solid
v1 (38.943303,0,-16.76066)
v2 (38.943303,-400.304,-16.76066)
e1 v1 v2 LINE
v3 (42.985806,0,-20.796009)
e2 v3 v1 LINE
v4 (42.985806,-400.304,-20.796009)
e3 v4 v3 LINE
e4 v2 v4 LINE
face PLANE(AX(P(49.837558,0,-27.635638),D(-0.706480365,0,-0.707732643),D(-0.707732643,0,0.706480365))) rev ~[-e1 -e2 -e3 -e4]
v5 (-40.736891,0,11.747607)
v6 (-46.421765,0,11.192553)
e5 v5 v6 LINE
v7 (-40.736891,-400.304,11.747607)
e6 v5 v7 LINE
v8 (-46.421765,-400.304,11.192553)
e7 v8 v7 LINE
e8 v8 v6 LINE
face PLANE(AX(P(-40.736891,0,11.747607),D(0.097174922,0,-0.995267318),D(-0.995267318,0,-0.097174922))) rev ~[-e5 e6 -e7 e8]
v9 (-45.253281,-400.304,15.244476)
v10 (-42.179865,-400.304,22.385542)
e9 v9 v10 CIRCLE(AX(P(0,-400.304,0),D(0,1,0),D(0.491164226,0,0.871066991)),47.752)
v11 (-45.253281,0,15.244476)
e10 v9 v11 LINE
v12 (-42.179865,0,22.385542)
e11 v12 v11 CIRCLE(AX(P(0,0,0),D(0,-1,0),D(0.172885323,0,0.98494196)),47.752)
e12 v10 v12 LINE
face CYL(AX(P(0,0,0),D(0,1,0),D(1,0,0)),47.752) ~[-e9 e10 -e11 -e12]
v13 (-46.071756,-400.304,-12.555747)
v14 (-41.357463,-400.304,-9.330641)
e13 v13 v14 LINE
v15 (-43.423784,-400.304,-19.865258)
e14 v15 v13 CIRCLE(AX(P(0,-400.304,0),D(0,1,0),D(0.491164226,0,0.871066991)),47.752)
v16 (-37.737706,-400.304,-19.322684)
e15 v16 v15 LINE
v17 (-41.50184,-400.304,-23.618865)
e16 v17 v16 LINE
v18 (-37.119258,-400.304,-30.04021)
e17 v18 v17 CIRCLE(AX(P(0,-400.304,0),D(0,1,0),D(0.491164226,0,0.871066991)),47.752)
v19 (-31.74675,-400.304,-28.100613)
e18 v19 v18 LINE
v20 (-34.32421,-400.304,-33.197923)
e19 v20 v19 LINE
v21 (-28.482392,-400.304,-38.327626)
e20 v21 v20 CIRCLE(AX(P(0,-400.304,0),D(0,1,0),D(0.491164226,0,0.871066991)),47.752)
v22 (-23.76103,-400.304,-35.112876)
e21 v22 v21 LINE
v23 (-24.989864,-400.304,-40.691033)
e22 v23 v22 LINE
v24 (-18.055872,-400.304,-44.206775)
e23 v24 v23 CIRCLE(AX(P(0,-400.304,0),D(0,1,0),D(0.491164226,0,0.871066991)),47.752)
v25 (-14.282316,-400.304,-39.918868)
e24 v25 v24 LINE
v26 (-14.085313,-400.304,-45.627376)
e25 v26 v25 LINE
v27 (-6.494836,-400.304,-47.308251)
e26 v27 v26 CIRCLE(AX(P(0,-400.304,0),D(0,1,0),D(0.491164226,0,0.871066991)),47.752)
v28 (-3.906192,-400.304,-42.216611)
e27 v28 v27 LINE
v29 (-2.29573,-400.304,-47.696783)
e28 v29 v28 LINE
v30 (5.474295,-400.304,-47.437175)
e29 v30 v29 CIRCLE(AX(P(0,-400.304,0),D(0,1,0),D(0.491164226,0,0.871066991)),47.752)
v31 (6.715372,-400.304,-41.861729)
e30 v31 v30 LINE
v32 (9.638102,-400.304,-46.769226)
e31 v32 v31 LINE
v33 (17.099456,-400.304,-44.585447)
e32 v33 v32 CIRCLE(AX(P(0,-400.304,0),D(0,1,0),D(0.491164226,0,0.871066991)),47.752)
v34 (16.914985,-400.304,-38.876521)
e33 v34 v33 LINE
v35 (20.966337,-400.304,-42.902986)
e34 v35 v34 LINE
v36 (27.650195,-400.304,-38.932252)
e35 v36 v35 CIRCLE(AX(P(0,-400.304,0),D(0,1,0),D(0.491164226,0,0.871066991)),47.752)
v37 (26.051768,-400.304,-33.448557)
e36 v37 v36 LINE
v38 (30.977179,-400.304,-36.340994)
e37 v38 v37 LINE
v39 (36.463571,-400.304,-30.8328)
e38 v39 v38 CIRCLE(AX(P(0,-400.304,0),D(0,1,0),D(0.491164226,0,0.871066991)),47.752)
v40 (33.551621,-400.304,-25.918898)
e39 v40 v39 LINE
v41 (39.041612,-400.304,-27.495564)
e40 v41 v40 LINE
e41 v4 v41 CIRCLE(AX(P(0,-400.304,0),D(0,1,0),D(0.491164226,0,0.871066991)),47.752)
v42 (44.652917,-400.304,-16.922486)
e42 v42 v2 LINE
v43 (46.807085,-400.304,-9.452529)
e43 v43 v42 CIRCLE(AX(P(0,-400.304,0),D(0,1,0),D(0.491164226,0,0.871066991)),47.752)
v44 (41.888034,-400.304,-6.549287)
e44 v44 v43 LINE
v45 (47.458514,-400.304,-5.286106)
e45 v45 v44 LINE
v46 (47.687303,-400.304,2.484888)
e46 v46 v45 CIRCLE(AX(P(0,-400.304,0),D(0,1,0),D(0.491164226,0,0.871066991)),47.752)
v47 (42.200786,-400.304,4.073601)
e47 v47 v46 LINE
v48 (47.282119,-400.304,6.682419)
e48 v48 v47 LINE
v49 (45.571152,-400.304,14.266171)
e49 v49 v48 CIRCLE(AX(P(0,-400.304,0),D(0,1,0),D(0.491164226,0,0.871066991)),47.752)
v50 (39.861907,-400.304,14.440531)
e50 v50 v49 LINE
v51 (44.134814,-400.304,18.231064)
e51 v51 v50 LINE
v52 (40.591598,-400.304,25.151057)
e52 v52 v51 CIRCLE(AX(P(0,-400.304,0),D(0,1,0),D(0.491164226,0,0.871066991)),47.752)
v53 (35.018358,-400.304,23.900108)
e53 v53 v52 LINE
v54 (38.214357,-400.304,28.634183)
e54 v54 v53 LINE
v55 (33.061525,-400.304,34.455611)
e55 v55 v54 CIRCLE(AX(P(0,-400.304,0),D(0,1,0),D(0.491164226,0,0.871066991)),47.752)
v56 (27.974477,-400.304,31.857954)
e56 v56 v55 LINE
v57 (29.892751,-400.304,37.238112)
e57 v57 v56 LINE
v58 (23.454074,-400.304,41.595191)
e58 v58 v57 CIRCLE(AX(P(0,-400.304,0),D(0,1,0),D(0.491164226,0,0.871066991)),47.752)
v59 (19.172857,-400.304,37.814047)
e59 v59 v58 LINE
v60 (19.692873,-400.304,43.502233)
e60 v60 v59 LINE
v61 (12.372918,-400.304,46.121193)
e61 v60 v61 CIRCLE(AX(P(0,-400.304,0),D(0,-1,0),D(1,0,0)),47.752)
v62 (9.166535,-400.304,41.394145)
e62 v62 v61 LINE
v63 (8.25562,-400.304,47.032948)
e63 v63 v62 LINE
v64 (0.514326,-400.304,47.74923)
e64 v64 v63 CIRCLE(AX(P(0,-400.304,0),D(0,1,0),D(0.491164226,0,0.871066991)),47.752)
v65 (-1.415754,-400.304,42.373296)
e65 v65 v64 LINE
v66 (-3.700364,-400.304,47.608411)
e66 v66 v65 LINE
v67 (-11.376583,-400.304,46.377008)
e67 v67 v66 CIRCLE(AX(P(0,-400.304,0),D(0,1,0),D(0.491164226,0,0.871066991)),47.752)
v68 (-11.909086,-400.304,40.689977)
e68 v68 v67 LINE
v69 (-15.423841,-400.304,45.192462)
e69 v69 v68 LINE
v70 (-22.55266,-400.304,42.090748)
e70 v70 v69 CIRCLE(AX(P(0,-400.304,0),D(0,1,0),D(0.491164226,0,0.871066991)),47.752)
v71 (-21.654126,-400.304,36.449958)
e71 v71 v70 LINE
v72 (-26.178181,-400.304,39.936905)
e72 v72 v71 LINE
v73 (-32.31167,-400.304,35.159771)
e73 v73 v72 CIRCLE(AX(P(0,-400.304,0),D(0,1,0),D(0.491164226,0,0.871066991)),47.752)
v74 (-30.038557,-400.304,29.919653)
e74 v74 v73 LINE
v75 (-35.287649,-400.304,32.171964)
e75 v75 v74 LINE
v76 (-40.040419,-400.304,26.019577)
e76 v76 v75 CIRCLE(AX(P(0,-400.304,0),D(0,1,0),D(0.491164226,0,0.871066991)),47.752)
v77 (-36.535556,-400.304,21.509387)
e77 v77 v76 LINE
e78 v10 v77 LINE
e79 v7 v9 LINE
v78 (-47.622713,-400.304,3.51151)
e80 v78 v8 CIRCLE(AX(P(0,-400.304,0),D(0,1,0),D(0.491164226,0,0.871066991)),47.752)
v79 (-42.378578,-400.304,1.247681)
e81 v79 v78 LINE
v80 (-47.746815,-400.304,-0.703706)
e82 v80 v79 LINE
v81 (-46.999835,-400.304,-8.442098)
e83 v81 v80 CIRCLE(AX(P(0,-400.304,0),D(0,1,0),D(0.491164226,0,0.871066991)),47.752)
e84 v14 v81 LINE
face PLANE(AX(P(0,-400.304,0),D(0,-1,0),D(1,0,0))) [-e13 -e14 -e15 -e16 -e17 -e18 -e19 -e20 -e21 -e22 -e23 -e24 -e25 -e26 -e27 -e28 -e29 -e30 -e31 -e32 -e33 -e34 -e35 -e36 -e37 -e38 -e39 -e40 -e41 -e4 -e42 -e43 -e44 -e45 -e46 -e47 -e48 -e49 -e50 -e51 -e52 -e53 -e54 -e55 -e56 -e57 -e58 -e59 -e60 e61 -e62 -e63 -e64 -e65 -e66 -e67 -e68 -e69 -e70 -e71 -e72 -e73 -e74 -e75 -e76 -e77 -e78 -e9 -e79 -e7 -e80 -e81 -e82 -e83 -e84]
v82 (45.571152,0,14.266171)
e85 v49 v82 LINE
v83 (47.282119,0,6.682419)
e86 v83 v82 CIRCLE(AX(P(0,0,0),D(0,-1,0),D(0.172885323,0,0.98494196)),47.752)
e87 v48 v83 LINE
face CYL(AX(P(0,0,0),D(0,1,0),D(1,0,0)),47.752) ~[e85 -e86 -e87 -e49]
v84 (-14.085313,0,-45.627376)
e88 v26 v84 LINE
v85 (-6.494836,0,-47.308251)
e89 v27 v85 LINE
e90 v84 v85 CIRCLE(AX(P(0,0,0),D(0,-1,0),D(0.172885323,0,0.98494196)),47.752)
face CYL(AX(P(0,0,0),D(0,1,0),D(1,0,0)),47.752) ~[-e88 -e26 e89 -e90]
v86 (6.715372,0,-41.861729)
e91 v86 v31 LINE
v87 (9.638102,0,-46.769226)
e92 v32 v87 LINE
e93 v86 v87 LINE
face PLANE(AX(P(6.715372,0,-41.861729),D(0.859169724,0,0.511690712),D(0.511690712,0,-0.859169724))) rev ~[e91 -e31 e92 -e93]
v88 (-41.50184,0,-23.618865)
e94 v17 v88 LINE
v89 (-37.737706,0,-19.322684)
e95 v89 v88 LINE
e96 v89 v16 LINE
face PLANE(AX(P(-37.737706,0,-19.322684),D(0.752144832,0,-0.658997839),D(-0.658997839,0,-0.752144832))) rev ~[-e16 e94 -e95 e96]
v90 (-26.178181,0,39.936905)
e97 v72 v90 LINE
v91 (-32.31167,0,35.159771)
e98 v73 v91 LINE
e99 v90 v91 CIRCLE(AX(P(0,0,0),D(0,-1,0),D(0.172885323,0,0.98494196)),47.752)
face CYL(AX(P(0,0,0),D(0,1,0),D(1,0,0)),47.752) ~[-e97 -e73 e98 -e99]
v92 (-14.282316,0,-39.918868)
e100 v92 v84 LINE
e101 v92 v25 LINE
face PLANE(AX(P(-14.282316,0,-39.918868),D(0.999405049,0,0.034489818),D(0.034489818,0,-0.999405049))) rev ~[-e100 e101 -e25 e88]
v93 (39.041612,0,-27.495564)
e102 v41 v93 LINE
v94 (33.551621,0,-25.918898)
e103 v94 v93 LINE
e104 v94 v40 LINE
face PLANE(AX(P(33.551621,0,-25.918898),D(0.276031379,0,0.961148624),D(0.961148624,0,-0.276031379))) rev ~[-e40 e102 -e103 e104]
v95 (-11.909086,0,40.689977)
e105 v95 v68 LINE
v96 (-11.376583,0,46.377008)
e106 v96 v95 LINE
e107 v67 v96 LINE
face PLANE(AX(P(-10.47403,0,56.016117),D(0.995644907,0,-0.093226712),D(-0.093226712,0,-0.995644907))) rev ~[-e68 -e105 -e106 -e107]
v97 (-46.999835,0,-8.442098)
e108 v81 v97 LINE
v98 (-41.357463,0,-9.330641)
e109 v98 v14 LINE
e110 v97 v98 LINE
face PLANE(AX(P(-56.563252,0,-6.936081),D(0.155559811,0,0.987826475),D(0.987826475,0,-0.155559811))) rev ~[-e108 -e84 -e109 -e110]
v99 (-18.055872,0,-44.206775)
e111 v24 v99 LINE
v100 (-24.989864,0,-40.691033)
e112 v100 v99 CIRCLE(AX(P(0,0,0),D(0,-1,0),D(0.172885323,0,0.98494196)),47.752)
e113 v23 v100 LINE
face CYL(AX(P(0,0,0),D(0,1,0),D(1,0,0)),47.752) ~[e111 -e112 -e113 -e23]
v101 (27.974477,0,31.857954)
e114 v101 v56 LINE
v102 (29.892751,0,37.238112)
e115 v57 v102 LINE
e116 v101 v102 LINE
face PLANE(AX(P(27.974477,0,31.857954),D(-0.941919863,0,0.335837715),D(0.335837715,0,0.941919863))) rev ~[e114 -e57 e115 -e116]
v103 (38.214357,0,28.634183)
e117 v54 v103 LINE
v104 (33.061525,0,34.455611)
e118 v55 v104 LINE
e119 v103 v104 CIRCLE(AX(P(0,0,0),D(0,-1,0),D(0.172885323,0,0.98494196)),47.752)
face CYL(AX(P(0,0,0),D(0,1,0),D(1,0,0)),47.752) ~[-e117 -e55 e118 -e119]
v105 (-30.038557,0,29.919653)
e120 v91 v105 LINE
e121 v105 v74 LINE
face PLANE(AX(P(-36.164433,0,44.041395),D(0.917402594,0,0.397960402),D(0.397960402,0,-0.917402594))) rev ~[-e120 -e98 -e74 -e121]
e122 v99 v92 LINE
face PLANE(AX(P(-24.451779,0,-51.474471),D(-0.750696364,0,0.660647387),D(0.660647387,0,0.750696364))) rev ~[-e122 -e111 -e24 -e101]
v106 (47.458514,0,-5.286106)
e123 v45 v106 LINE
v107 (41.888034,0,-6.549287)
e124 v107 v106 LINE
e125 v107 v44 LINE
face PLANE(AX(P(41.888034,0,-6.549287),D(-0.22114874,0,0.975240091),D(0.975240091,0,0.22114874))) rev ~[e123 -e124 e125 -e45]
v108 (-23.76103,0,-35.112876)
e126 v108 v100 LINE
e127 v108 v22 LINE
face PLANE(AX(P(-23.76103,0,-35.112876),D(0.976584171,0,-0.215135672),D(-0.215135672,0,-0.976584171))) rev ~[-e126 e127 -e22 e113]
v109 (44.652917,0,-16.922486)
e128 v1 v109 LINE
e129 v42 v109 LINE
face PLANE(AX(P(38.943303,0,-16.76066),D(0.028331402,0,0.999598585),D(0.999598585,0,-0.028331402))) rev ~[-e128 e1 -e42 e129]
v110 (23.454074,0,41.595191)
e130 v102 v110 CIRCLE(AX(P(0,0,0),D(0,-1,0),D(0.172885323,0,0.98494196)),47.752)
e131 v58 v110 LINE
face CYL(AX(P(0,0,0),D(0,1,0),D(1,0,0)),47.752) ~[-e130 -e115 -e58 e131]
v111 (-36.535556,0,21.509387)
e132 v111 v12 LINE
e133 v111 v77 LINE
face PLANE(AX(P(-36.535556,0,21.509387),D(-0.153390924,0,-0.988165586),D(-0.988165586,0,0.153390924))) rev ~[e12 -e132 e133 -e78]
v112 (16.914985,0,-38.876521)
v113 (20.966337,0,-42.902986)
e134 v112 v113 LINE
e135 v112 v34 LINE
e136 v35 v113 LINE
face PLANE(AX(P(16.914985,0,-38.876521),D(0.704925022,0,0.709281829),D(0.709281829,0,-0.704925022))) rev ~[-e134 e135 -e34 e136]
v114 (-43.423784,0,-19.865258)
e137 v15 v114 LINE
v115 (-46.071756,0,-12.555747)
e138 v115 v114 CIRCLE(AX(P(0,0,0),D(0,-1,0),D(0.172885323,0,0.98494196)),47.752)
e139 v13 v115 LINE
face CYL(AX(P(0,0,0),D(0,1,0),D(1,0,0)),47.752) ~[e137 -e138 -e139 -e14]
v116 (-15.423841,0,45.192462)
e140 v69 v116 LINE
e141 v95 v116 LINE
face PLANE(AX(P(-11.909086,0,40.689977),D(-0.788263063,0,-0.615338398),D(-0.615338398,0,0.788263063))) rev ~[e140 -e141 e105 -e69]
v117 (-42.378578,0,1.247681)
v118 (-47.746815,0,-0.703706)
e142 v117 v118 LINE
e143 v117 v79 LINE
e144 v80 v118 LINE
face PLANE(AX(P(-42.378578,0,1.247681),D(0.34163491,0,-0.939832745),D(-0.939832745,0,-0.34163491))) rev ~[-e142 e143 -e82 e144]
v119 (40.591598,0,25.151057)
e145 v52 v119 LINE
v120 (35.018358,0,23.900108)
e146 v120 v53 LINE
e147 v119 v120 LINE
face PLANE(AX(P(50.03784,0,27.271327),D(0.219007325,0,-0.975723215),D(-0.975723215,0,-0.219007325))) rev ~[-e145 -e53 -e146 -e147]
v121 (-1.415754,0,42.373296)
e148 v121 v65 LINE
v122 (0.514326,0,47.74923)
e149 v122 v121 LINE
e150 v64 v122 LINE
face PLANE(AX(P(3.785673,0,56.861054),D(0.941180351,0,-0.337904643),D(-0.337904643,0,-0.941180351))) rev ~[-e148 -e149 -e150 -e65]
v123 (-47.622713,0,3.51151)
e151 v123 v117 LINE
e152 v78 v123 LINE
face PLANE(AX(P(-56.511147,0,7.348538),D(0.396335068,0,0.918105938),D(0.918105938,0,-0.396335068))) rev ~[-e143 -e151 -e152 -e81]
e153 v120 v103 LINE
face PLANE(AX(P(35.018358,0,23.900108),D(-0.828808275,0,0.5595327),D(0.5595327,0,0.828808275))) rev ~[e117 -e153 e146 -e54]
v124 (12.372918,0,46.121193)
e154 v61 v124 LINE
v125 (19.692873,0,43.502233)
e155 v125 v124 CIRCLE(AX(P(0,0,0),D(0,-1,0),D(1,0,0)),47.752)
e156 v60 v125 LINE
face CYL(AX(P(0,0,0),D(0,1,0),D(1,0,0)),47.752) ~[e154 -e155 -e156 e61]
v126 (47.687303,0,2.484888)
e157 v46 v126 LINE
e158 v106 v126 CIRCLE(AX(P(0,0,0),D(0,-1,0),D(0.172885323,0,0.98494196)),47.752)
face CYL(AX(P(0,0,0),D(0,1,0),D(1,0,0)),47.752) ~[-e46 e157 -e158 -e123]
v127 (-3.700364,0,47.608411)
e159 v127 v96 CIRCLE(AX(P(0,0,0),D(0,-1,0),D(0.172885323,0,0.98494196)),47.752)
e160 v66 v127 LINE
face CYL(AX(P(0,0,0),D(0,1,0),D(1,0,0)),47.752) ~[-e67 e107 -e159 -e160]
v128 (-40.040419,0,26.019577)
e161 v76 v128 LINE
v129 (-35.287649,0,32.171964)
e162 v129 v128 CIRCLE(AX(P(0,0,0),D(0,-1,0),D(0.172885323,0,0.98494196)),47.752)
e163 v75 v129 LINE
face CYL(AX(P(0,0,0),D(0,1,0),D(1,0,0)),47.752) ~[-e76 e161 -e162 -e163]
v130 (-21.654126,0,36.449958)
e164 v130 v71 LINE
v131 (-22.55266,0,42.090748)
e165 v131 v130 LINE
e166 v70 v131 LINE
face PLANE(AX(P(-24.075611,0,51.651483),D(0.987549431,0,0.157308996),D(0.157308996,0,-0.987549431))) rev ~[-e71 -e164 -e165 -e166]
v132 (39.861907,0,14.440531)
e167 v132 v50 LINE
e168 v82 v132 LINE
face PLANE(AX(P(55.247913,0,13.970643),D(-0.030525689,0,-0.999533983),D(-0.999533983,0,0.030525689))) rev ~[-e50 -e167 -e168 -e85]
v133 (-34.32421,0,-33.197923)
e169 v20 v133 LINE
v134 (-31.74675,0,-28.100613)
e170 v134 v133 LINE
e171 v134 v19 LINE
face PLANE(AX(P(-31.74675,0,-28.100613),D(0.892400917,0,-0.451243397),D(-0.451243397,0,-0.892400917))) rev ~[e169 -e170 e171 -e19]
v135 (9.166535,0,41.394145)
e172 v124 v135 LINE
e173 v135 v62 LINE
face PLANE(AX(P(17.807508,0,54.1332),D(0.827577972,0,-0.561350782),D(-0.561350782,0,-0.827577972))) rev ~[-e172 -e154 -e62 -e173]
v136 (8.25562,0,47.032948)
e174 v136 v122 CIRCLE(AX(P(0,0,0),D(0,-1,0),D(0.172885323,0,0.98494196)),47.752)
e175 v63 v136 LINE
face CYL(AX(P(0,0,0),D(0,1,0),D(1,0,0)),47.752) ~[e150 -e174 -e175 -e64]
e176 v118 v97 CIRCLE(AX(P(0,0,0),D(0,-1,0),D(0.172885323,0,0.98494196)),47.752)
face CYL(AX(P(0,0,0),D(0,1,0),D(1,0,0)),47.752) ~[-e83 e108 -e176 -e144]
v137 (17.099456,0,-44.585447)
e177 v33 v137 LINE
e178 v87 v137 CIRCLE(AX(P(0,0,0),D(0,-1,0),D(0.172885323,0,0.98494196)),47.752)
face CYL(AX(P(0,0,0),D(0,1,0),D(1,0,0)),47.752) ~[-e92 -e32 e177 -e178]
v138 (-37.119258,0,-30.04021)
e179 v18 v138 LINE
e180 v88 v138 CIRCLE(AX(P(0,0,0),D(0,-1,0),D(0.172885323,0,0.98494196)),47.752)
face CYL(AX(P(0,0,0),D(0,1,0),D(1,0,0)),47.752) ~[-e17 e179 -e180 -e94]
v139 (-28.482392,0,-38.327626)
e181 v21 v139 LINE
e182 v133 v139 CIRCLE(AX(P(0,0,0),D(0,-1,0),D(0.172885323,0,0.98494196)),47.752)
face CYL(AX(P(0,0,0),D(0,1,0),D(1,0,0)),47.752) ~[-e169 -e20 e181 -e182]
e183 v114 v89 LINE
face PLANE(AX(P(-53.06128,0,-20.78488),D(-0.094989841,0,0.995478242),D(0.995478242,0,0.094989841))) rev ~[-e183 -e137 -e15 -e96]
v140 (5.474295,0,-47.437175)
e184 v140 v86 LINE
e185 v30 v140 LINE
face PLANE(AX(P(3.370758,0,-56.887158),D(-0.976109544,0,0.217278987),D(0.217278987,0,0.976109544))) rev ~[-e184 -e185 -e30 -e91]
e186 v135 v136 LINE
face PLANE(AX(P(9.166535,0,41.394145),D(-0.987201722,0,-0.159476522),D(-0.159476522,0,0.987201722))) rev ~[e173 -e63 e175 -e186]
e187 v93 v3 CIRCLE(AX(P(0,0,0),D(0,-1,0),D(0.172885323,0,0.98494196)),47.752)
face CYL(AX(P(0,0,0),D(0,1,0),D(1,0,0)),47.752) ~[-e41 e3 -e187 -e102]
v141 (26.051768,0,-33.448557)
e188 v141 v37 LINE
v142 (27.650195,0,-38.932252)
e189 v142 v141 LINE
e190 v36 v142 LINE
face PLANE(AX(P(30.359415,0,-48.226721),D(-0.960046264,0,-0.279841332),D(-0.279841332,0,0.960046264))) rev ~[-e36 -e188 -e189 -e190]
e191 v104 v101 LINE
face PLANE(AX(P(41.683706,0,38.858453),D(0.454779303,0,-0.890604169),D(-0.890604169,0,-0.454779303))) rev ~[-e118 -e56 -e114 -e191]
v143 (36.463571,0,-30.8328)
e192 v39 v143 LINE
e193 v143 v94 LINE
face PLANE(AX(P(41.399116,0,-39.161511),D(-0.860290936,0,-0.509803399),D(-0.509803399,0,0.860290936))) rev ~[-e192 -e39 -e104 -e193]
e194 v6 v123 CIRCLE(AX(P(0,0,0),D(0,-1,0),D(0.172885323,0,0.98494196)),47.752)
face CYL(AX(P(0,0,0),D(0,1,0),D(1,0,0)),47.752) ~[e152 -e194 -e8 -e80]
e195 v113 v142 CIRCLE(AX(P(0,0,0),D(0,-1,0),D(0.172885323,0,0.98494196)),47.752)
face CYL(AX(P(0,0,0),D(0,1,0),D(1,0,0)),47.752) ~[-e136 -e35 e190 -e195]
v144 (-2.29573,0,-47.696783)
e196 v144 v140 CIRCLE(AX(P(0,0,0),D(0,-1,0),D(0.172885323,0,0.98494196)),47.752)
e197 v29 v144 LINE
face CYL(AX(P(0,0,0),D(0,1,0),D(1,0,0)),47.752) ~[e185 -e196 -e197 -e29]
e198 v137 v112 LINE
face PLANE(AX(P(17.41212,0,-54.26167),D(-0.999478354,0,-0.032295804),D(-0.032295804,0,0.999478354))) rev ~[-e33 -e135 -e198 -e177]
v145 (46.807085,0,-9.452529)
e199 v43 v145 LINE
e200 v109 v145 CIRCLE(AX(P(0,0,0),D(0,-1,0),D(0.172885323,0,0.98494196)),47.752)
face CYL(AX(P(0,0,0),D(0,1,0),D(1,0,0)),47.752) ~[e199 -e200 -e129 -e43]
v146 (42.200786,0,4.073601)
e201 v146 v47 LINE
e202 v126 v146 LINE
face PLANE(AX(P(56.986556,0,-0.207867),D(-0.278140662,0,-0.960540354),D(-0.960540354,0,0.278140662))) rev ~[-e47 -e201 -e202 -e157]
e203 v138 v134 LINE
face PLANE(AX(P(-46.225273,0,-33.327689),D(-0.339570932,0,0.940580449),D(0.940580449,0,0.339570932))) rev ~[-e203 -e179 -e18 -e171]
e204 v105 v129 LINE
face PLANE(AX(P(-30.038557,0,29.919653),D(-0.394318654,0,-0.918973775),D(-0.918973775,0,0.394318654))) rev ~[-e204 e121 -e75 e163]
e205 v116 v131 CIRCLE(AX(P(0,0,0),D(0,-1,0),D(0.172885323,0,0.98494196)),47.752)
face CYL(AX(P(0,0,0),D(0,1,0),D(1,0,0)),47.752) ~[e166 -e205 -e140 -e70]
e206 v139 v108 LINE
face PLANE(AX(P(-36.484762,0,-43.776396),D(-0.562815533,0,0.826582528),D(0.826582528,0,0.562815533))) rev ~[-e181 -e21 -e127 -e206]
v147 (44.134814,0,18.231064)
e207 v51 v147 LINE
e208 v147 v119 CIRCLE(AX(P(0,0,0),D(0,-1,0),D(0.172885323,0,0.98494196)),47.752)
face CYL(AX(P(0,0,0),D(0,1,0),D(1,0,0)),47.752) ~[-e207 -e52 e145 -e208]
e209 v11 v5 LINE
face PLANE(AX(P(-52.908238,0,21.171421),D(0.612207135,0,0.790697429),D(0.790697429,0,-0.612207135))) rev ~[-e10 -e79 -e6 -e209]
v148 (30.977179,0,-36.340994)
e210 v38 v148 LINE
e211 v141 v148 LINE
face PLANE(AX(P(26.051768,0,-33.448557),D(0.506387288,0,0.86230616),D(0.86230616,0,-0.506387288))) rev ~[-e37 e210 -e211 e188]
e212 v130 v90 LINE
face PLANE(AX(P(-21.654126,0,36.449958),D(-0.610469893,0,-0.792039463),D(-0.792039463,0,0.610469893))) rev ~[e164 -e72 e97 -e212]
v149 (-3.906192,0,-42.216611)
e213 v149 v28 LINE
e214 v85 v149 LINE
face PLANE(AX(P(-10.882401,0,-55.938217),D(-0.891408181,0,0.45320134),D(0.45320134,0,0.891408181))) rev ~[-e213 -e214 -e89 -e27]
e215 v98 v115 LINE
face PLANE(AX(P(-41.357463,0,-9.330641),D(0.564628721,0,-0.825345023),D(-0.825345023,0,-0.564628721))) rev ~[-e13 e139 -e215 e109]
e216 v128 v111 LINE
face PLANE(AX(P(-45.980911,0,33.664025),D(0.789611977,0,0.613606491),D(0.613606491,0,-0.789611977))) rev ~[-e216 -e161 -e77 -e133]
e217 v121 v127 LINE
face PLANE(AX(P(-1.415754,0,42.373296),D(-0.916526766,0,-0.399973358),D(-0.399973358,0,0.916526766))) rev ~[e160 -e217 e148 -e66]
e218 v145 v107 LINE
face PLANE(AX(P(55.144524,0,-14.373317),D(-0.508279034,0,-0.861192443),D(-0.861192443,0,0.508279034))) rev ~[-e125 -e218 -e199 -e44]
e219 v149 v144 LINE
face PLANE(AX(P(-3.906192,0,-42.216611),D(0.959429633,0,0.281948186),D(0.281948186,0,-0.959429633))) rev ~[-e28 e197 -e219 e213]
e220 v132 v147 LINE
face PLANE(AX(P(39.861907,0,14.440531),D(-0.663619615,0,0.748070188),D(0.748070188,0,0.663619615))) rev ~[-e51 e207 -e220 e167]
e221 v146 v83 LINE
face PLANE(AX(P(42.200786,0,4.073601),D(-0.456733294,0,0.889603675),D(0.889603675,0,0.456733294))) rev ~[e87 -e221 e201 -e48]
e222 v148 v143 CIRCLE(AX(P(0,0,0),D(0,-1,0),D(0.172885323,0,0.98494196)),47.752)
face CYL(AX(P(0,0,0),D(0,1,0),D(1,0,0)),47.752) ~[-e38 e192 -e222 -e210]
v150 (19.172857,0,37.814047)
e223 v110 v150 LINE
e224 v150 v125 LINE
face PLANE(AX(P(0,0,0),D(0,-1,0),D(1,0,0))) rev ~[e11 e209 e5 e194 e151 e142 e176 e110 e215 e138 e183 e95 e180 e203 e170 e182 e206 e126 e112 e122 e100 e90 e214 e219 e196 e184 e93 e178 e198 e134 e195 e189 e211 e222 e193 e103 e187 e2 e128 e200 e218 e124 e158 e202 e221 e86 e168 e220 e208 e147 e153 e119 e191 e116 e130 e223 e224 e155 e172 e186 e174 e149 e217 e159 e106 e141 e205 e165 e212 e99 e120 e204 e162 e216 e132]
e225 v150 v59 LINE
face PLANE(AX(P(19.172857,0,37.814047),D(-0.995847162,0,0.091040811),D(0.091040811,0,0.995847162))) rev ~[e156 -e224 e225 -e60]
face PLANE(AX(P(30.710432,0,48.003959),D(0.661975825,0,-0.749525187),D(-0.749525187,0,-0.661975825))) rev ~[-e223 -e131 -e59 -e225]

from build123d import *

# Parameters (mm, degrees)
F0_R            = 47.752
F1_DEPTH        = 400.304
F3_DEPTH        = 400.305
F3_COPIES_COUNT = 25


# Not quite as in the source:
# - a pattern or mirror of a feature is missing from the dataset's text; its kind, count and spacing are read off the source's solid


with BuildPart() as f1:
    # F0 (on Front) → F1 (new body)
    with BuildSketch(Plane.XZ):
        Circle(F0_R)
    extrude(amount=F1_DEPTH)

    # F2 (on face) → F3 (cut, through all)
    with BuildSketch(Plane(origin=(0, 0, 0), x_dir=(-1, 0, 0), z_dir=(0, 1, 0))):
        Polygon((-9.1665348659, 41.3941448169), (-6.7116842624, 56.5903173732), (-17.8075077925, 54.133200462), align=None)
    f3 = extrude(amount=-F3_DEPTH, mode=Mode.SUBTRACT)

    # F3_copies: F3 ×25 about axis
    f3_copies_axis = Axis((0, 0, 0), (0, 1, 0))
    for i in range(1, F3_COPIES_COUNT):
        add(f3.rotate(f3_copies_axis, i * 360 / F3_COPIES_COUNT), mode=Mode.SUBTRACT)


solid = f1.part
